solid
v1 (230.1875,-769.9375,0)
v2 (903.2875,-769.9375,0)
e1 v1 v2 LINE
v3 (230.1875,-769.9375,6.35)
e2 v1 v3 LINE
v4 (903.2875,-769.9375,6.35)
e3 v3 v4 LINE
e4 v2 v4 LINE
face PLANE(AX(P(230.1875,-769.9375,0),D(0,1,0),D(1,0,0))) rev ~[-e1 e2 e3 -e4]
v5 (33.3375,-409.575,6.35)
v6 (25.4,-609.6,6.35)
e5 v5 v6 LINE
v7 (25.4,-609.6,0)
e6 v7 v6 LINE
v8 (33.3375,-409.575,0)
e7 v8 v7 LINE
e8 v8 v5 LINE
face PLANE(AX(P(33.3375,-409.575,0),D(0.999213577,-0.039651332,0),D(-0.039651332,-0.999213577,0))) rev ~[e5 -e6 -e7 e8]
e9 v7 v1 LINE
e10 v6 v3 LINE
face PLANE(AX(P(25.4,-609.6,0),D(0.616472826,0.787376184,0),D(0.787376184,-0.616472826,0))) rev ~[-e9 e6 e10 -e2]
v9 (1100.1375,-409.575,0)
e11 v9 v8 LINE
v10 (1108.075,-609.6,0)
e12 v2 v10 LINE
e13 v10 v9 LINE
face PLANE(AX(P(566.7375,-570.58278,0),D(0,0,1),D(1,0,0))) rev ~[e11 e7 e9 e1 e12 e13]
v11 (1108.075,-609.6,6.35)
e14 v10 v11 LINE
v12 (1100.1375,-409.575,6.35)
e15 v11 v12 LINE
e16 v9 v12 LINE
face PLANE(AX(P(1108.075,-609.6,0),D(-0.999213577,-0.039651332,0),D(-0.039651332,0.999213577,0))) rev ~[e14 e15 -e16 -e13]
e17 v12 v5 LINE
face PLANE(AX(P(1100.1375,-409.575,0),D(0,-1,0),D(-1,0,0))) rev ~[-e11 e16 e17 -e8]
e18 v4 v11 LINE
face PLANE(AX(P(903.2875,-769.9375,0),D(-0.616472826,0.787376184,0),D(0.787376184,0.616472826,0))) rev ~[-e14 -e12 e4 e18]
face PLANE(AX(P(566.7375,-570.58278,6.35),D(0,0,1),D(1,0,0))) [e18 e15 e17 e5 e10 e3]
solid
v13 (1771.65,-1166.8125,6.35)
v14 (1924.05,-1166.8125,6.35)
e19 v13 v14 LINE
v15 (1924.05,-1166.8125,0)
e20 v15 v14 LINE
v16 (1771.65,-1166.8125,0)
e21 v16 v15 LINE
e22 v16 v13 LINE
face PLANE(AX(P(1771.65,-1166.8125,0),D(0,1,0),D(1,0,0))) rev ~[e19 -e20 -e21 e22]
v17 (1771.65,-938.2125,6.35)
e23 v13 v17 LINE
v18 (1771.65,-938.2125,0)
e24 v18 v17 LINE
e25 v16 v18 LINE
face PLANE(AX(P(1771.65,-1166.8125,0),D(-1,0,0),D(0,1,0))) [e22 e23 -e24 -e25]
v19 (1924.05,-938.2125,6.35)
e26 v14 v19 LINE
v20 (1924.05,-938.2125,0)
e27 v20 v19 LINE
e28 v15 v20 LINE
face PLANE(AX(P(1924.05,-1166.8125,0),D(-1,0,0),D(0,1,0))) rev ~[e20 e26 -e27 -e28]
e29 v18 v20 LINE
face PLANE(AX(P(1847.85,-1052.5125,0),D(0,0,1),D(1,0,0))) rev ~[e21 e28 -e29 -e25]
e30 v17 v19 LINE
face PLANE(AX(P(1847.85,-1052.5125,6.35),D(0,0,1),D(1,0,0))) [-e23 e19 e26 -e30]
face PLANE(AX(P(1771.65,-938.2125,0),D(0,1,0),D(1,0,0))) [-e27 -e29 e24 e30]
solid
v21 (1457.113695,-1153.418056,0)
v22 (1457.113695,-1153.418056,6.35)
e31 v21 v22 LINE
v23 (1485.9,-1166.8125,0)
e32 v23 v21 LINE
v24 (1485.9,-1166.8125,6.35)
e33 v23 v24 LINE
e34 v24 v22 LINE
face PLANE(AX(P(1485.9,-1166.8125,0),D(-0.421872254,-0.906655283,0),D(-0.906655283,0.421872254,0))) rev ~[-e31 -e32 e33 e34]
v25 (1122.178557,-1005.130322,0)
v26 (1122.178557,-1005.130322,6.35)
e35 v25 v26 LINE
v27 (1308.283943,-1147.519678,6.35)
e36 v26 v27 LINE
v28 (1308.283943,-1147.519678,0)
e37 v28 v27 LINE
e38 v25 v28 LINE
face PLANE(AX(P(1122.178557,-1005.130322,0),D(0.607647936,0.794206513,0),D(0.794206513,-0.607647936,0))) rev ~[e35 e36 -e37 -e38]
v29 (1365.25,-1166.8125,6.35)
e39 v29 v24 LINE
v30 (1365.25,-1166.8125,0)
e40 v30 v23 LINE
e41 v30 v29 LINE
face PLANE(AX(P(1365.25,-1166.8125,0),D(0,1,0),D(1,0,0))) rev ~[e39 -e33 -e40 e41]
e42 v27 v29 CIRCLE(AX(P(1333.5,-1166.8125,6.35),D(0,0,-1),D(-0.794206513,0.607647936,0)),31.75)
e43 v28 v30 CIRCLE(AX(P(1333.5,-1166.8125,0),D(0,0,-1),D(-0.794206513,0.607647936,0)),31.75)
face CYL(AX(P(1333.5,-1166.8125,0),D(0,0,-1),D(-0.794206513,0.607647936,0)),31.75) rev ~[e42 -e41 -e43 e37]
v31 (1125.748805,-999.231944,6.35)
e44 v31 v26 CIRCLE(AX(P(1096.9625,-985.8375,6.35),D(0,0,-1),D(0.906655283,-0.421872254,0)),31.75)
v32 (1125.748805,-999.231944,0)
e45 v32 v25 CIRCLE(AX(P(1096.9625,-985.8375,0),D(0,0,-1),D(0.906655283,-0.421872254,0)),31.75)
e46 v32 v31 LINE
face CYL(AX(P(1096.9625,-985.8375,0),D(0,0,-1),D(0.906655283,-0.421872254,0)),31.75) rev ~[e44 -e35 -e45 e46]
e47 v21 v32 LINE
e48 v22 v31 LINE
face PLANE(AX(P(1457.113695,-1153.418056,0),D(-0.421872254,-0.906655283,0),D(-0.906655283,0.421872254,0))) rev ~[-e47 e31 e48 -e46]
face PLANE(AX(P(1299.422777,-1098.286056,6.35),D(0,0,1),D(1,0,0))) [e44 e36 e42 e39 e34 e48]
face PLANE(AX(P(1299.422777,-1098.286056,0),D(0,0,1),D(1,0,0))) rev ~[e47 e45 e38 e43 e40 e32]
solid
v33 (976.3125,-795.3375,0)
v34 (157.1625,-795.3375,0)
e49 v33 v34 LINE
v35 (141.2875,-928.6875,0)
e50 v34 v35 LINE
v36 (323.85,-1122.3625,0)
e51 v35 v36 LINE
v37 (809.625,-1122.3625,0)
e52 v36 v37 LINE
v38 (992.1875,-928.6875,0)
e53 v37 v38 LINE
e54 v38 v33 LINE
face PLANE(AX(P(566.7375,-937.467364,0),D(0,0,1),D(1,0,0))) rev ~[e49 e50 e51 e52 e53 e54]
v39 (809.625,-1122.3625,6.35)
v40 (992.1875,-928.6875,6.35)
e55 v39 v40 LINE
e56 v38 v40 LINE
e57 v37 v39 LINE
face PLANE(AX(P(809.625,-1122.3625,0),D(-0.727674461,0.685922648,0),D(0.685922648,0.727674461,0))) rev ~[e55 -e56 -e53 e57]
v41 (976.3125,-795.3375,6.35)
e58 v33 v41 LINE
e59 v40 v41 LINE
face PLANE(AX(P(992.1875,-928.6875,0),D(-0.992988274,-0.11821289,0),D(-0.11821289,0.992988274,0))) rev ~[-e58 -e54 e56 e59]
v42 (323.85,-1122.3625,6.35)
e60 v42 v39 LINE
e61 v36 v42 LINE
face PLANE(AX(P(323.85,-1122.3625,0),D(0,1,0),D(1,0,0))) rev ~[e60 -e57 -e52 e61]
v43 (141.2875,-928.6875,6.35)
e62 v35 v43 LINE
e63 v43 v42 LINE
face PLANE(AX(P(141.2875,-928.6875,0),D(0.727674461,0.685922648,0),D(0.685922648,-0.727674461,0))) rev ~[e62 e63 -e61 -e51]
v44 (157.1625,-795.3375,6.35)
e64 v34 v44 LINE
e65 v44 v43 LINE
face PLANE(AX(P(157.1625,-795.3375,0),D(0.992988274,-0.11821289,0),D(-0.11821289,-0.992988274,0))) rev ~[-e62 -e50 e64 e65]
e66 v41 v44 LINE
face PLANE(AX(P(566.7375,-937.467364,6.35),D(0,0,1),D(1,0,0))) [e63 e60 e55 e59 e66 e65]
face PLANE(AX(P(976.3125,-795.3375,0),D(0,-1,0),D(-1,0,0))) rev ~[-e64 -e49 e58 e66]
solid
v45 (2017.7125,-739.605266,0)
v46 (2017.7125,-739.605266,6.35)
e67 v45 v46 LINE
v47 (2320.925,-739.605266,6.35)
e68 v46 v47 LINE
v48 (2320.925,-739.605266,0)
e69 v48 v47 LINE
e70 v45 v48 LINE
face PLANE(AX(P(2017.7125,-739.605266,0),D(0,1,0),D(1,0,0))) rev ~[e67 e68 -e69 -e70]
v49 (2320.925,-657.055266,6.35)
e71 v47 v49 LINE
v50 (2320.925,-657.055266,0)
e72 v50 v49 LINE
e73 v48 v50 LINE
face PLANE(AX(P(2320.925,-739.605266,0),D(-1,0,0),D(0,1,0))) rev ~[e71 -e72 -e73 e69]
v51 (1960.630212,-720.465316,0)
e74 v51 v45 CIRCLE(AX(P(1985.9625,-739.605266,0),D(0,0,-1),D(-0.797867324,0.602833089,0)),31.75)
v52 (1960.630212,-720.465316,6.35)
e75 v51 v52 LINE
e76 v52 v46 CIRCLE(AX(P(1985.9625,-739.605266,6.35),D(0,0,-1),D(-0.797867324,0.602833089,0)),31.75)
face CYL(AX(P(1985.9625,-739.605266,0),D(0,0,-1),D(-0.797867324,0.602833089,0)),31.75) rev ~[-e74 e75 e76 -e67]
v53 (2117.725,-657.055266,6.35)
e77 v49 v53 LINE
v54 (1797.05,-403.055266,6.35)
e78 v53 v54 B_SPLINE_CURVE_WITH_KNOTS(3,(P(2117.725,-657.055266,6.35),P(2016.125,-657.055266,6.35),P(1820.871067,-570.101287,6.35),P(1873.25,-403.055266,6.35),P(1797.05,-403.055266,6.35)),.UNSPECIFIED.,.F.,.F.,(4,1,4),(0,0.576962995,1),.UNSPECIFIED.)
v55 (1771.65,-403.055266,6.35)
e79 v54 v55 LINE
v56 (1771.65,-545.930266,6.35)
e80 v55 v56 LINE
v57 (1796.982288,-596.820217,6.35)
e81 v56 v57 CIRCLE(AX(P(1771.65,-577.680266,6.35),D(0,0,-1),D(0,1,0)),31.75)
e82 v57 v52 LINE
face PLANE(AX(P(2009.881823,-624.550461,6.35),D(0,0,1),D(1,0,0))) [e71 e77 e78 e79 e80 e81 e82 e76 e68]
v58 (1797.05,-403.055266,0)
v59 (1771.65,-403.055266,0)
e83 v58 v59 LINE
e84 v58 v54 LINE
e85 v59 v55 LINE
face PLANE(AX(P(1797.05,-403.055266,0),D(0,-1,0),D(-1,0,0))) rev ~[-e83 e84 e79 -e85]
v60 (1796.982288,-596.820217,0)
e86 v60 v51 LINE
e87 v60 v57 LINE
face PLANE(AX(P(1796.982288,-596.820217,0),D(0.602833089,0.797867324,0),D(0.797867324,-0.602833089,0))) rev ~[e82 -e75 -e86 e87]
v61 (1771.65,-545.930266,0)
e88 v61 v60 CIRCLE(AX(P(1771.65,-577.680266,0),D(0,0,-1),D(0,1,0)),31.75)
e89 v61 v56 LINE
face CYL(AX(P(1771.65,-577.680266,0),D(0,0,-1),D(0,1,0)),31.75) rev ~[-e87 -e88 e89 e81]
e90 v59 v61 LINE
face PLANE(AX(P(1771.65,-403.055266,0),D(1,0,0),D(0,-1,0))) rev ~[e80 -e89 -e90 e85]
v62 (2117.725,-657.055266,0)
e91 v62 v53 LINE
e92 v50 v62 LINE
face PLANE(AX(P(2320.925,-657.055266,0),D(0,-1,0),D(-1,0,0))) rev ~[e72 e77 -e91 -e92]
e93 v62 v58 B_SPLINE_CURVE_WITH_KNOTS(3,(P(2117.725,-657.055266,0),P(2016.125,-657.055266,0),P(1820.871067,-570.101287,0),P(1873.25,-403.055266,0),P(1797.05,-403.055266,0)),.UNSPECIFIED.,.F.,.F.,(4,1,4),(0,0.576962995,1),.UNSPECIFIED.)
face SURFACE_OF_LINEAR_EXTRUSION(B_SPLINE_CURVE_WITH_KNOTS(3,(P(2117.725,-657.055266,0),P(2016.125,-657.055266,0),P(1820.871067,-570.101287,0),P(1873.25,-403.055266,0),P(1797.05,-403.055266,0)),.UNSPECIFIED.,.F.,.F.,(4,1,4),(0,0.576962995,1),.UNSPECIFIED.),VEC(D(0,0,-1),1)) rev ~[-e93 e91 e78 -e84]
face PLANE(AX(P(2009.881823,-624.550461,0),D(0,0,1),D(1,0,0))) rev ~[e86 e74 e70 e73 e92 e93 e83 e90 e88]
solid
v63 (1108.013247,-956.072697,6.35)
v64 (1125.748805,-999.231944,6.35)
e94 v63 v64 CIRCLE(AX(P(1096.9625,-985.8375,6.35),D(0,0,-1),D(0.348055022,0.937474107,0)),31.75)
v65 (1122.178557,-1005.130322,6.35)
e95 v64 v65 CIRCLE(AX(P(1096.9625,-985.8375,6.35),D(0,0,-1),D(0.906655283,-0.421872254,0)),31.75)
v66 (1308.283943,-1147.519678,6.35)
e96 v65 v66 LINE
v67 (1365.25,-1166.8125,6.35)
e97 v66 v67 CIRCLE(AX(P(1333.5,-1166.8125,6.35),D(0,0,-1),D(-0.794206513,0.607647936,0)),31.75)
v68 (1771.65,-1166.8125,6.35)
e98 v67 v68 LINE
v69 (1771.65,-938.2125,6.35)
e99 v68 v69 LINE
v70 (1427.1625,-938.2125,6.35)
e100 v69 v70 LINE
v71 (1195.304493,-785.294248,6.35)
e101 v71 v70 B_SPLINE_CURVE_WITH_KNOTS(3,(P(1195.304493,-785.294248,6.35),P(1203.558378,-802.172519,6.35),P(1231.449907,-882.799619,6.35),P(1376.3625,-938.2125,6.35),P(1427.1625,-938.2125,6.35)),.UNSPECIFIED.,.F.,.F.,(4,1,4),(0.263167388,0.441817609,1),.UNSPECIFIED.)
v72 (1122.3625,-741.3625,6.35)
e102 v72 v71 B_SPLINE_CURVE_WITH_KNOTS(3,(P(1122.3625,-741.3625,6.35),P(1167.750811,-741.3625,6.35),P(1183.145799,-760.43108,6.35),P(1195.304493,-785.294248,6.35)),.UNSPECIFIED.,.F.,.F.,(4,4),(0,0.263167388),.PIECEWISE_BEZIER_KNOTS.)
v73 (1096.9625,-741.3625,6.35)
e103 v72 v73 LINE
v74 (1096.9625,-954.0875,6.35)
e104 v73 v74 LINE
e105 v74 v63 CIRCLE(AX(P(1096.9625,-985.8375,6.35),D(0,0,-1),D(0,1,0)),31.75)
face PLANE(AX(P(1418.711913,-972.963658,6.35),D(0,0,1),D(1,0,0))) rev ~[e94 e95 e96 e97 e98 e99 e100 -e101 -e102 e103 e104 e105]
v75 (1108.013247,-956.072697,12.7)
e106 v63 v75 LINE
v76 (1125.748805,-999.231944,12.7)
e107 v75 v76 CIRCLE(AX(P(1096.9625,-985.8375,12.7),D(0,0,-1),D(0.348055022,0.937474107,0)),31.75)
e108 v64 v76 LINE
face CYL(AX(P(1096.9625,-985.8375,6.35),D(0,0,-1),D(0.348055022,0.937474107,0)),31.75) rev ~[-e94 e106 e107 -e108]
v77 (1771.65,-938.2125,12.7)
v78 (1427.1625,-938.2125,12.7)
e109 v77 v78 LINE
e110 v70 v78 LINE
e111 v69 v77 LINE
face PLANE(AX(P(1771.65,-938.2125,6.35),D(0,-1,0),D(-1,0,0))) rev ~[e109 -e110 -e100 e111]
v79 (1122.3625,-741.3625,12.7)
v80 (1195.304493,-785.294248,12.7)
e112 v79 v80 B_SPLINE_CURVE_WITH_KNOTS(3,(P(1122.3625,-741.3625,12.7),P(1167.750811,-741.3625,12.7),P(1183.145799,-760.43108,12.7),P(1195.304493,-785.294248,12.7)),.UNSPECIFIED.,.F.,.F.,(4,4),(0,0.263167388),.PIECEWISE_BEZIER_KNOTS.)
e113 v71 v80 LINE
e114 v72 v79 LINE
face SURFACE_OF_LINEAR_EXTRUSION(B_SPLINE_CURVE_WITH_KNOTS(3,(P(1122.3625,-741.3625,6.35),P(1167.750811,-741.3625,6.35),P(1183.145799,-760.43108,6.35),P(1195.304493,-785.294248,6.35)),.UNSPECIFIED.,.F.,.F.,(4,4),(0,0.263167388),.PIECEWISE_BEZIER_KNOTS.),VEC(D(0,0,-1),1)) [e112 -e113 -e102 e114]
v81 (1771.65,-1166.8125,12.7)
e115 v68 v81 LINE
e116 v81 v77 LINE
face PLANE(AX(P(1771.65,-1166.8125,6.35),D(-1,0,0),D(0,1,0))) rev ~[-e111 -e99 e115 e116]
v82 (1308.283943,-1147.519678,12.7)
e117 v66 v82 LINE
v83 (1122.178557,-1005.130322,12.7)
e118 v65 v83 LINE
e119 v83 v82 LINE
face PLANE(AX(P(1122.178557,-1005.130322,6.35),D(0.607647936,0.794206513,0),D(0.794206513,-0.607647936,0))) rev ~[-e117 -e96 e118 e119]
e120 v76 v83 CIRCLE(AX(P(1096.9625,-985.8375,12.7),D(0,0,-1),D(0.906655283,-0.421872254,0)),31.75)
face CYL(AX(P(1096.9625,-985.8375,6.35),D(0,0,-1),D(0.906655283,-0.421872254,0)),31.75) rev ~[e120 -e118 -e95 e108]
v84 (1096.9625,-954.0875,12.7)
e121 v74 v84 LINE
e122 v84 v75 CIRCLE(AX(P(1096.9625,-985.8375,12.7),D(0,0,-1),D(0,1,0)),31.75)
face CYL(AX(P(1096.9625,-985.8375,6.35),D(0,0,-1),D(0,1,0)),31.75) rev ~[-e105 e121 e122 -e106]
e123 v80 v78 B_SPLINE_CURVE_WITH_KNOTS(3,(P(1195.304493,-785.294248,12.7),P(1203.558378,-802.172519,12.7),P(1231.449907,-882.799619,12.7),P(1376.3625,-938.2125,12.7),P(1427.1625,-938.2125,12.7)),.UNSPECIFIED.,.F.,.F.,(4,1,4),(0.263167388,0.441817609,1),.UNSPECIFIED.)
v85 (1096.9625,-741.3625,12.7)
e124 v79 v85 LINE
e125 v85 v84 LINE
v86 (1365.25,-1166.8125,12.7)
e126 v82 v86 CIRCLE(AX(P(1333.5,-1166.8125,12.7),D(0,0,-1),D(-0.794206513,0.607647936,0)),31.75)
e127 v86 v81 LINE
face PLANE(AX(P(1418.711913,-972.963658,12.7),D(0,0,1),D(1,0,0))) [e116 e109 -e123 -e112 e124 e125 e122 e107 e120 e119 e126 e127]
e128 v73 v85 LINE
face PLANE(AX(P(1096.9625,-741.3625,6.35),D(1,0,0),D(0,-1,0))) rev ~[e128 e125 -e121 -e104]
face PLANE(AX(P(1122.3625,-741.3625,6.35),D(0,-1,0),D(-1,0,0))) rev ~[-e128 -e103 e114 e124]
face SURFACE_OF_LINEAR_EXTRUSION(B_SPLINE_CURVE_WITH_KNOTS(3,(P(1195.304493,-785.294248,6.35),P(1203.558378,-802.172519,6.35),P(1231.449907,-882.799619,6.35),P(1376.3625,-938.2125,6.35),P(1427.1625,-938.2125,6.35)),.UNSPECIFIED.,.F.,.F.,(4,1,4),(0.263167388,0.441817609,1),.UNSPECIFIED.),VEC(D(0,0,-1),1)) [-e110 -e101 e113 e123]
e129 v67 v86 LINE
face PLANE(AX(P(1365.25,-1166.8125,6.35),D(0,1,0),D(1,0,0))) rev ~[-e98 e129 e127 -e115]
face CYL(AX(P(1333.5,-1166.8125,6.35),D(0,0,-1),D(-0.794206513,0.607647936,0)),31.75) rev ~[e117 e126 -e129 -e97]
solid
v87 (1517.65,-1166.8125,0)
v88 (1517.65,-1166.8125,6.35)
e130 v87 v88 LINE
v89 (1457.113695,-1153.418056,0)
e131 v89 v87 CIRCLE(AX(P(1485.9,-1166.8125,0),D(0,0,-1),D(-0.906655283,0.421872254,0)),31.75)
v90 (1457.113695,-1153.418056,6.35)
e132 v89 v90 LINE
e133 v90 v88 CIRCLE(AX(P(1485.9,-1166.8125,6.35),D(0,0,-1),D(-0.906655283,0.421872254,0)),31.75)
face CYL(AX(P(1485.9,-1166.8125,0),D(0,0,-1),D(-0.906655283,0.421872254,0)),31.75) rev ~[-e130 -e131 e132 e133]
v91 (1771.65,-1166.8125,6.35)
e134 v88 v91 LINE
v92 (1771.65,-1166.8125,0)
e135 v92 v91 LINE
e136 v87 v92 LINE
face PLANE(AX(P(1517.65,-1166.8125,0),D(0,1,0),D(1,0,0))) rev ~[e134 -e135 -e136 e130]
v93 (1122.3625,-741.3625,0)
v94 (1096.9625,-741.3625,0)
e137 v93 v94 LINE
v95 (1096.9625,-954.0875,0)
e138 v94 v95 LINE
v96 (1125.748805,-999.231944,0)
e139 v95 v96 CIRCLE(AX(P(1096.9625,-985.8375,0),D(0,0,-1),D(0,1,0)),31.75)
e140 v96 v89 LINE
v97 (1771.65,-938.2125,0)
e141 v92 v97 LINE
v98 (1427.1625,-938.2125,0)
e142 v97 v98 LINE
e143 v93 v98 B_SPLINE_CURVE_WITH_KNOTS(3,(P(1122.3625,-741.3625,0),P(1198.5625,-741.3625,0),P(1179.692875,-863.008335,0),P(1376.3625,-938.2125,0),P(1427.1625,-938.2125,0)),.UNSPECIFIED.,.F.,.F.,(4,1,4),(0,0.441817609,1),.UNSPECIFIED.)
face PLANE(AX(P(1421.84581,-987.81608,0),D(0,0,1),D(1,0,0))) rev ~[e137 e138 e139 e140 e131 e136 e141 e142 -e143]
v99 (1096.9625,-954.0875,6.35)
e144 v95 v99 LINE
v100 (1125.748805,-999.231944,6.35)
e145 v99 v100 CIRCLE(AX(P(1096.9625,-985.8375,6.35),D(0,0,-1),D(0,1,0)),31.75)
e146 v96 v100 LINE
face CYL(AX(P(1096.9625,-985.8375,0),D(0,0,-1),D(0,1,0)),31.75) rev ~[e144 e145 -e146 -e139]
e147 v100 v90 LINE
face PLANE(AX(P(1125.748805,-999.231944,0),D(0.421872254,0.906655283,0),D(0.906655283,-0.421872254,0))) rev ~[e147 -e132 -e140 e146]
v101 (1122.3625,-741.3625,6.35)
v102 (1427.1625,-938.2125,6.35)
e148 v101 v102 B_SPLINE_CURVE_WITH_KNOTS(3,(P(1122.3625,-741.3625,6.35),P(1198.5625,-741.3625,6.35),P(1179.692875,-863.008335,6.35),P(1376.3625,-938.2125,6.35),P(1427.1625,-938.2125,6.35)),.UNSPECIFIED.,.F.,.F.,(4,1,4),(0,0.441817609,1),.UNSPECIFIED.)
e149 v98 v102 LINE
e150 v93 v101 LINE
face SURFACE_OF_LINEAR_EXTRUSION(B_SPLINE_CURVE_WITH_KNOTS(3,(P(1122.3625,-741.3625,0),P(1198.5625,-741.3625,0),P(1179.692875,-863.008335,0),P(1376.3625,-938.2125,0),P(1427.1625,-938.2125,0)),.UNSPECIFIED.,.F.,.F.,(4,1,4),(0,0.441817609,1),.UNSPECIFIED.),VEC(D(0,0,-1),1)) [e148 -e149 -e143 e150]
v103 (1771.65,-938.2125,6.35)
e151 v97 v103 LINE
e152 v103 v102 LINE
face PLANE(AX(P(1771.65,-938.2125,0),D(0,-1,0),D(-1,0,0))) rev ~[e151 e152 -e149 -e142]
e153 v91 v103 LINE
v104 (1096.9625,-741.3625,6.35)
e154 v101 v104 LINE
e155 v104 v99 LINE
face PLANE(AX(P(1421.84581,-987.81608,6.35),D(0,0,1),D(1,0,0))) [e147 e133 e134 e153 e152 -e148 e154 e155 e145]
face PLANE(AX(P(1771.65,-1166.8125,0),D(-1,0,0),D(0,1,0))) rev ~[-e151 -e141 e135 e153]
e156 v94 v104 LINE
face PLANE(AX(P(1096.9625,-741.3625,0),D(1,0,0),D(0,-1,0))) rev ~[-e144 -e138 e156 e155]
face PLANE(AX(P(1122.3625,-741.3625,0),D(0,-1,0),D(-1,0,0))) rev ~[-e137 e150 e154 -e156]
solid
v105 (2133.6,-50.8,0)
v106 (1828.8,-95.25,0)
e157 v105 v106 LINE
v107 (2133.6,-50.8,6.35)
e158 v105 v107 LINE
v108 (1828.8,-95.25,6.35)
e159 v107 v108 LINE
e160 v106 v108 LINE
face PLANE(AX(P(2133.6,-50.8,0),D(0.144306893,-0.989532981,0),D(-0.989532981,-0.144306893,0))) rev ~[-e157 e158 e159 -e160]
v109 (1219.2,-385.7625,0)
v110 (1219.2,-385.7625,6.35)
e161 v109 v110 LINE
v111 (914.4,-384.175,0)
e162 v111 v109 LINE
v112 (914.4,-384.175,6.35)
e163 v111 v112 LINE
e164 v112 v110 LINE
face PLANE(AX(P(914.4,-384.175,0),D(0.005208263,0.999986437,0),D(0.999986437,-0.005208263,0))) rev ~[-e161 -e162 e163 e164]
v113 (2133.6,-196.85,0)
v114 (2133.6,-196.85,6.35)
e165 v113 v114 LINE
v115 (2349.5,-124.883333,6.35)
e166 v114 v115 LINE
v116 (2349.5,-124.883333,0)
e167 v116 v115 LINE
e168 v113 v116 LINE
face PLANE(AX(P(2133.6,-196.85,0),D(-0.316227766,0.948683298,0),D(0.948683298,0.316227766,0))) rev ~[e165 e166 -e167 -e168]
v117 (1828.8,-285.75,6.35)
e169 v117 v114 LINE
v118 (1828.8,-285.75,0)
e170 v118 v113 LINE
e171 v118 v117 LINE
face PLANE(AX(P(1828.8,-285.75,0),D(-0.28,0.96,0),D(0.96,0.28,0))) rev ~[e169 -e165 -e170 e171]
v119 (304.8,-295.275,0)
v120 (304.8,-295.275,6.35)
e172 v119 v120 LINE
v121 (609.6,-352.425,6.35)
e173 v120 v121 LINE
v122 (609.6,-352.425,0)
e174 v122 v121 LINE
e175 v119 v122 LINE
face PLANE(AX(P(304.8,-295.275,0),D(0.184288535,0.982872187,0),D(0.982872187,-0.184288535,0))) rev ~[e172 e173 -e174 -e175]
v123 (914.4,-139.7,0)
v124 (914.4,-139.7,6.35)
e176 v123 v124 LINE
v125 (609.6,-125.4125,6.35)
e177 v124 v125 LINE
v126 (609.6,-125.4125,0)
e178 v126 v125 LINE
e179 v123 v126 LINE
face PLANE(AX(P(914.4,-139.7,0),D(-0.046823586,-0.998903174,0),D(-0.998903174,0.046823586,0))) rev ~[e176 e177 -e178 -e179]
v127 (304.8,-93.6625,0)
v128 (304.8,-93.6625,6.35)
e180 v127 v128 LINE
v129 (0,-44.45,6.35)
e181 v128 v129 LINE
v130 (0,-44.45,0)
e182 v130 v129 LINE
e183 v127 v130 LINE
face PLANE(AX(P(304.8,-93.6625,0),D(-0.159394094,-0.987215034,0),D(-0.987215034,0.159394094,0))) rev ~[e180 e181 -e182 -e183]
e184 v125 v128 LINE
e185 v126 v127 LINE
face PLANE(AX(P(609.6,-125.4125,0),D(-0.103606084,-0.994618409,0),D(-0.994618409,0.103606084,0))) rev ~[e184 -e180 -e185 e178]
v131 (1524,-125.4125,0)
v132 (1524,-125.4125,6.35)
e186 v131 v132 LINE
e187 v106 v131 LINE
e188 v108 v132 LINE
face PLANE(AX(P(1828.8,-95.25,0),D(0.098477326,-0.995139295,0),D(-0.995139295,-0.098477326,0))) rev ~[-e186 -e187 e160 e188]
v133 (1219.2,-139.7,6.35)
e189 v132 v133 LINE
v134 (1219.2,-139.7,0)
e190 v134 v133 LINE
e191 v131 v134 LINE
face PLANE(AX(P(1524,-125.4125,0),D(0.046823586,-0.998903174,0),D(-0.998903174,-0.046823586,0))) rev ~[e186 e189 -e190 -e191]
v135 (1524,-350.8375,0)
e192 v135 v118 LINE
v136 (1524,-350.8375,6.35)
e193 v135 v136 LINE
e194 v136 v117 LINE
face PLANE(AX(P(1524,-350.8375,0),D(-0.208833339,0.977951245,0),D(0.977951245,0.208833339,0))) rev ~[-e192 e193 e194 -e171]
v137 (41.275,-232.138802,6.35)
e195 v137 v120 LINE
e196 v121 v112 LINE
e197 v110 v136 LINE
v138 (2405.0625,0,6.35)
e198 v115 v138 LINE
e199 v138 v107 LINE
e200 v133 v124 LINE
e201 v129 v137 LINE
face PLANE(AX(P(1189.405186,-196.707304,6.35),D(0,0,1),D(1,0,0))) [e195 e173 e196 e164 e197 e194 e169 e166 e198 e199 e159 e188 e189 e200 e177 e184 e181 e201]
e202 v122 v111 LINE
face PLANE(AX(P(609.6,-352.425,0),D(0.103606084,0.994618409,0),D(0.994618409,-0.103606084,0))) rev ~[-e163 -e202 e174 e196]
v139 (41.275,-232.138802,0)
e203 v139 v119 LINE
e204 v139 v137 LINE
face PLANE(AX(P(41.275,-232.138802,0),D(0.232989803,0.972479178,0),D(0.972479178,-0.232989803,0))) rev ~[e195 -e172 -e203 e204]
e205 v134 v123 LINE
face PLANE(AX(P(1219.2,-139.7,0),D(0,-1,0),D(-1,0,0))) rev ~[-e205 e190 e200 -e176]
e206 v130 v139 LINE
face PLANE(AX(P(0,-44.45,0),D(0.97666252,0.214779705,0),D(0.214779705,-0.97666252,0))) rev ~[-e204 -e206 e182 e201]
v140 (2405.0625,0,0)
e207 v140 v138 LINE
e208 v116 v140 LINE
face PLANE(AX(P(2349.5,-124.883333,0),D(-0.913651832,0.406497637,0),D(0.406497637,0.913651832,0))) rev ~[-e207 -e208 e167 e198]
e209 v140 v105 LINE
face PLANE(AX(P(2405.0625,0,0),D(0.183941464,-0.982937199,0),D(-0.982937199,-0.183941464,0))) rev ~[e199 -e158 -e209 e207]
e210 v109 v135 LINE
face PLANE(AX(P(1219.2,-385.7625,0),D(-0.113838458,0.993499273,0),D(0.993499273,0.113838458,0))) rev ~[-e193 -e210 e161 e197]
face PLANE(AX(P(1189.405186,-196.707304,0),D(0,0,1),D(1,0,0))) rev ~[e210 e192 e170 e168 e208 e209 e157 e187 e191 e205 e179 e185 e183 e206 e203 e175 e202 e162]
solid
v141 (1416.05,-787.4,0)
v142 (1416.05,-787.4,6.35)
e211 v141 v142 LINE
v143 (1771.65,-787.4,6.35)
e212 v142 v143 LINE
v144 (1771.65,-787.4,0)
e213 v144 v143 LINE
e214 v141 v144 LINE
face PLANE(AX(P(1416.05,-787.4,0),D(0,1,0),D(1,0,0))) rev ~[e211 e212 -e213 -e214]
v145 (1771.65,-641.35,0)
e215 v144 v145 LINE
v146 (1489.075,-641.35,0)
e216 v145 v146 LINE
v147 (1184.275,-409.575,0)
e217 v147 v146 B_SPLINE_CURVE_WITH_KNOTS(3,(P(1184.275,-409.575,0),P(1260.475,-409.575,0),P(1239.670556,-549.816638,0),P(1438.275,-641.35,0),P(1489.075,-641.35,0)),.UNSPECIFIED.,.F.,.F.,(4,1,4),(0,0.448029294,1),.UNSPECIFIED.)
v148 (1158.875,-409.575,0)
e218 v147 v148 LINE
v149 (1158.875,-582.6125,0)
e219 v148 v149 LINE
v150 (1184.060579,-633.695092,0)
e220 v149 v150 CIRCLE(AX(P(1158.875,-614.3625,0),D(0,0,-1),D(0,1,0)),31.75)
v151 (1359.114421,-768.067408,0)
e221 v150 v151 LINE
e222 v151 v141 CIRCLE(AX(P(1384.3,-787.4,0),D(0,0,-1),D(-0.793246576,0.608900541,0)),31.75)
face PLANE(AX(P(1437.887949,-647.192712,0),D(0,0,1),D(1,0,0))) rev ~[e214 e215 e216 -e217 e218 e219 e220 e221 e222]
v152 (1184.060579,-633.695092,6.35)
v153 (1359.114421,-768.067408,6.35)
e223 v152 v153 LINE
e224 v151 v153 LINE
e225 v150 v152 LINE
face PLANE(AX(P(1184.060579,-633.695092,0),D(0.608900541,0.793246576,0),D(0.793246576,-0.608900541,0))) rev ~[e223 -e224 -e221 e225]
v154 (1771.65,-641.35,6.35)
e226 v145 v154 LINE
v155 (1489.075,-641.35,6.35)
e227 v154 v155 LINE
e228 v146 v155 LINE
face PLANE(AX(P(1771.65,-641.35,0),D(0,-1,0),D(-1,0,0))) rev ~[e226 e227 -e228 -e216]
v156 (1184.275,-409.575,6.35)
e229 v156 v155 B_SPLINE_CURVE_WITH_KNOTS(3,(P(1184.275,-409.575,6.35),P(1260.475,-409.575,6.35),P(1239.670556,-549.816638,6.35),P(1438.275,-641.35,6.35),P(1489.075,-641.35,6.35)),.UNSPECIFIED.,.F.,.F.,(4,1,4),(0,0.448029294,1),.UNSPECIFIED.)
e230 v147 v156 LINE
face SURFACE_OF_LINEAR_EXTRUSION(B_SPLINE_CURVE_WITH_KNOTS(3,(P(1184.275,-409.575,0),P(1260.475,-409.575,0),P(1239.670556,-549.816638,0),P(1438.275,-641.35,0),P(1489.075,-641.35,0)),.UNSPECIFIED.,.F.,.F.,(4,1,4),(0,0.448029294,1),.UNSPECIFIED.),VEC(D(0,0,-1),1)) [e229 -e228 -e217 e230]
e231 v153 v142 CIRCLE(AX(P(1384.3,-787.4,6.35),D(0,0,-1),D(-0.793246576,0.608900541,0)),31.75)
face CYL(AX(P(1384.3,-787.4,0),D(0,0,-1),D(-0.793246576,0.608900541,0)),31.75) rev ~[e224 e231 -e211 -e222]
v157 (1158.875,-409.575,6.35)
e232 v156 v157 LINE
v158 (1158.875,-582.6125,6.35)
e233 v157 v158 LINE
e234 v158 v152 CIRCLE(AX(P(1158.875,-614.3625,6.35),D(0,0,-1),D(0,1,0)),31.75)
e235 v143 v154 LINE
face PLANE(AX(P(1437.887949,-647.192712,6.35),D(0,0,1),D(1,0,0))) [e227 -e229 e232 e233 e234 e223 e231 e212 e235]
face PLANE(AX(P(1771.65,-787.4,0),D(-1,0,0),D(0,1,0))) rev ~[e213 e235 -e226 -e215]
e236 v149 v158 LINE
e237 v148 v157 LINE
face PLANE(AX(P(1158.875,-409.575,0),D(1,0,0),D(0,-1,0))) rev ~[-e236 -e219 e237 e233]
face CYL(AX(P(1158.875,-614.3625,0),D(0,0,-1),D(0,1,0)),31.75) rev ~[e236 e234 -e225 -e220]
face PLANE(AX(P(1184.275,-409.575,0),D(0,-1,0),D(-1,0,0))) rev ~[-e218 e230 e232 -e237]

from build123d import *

# Parameters (mm, degrees)
F1_DEPTH = 6.35
F2_DEPTH = 6.35
F0_W     = 152.4
F0_H     = 228.6
F5_DEPTH = 6.35


with BuildPart() as f1:
    # F0 (on Top) → F1 (new body)
    with BuildSketch(Plane.XY):
        with BuildLine():
            Line((1184.275, -409.575), (1158.875, -409.575))
            Line((1158.875, -409.575), (1158.875, -582.6125))
            ThreePointArc((1158.875, -582.6125), (1187.3519406863, -600.3223308717), (1184.0605788026, -633.6950921795))
            Line((1184.0605788026, -633.6950921795), (1359.1144211974, -768.0674078205))
            ThreePointArc((1359.1144211974, -768.0674078205), (1394.5083390671, -757.3358633337), (1416.05, -787.4))
            Line((1416.05, -787.4), (1771.65, -787.4))
            Line((1771.65, -787.4), (1771.65, -641.35))
            Line((1771.65, -641.35), (1489.075, -641.35))
            add(Edge.make_bspline(
                [(1184.275, -409.575), (1260.475, -409.575), (1239.6705562427, -549.8166383278), (1438.275, -641.35), (1489.075, -641.35)],
                knots=[0, 0, 0, 0, 0.4480292942, 1, 1, 1, 1], degree=3))
        make_face()
    extrude(amount=F1_DEPTH)


with BuildPart() as f1b:
    # F0 (on Top) → F1, piece 2 (new body)
    with BuildSketch(Plane.XY):
        with BuildLine():
            Line((1517.65, -1166.8125), (1771.65, -1166.8125))
            Line((1771.65, -1166.8125), (1771.65, -938.2125))
            Line((1771.65, -938.2125), (1427.1625, -938.2125))
            add(Edge.make_bspline(
                [(1122.3625, -741.3625), (1198.5625, -741.3625), (1179.69287535, -863.0083351522), (1376.3625, -938.2125), (1427.1625, -938.2125)],
                knots=[0, 0, 0, 0, 0.441817609, 1, 1, 1, 1], degree=3))
            Line((1122.3625, -741.3625), (1096.9625, -741.3625))
            Line((1096.9625, -741.3625), (1096.9625, -954.0875))
            ThreePointArc((1096.9625, -954.0875), (1123.7331565008, -968.7672202566), (1125.7488052209, -999.231944062))
            Line((1125.7488052209, -999.231944062), (1457.1136947791, -1153.418055938))
            ThreePointArc((1457.1136947791, -1153.418055938), (1492.7592021853, -1135.8122766882), (1517.65, -1166.8125))
        make_face()
    extrude(amount=F1_DEPTH)


with BuildPart() as f1c:
    # F0 (on Top) → F1, piece 3 (new body)
    with BuildSketch(Plane.XY):
        with BuildLine():
            Line((1797.05, -403.0552663527), (1771.65, -403.0552663527))
            Line((1771.65, -403.0552663527), (1771.65, -545.9302663527))
            ThreePointArc((1771.65, -545.9302663527), (1800.0731941464, -563.5316079528), (1796.9822875345, -596.8202169344))
            Line((1796.9822875345, -596.8202169344), (1960.6302124655, -720.4653157711))
            ThreePointArc((1960.6302124655, -720.4653157711), (1996.0561210247, -709.5024207296), (2017.7125, -739.6052663527))
            Line((2017.7125, -739.6052663527), (2320.925, -739.6052663527))
            Line((2320.925, -739.6052663527), (2320.925, -657.0552663527))
            Line((2320.925, -657.0552663527), (2117.725, -657.0552663527))
            add(Edge.make_bspline(
                [(2117.725, -657.0552663527), (2016.125, -657.0552663527), (1820.8710671265, -570.1012868563), (1873.25, -403.0552663527), (1797.05, -403.0552663527)],
                knots=[0, 0, 0, 0, 0.5769629955, 1, 1, 1, 1], degree=3))
        make_face()
    extrude(amount=F1_DEPTH)


with BuildPart() as f1d:
    # F0 (on Top) → F1, piece 4 (new body)
    with BuildSketch(Plane.XY):
        Polygon((976.3125, -795.3375), (566.7375, -795.3375), (157.1625, -795.3375), (141.2875, -928.6875), (323.85, -1122.3625), (566.7375, -1122.3625), (809.625, -1122.3625), (992.1875, -928.6875), align=None)
    extrude(amount=F1_DEPTH)


with BuildPart() as f1e:
    # F0 (on Top) → F1, piece 5 (new body)
    with BuildSketch(Plane.XY):
        Polygon((566.7375, -409.575), (33.3375, -409.575), (25.4, -609.6), (230.1875, -769.9375), (566.7375, -769.9375), (903.2875, -769.9375), (1108.075, -609.6), (1100.1375, -409.575), align=None)
    extrude(amount=F1_DEPTH)


with BuildPart() as f1f:
    # F0 (on Top) → F1, piece 6 (new body)
    with BuildSketch(Plane.XY):
        Polygon((304.8, -93.6625), (0, -44.45), (41.275, -232.1388020833), (304.8, -295.275), (609.6, -352.425), (914.4, -384.175), (1219.2, -385.7625), (1524, -350.8375), (1828.8, -285.75), (2133.6, -196.85), (2349.5, -124.8833333333), (2405.0625, 0), (2133.6, -50.8), (1828.8, -95.25), (1524, -125.4125), (1219.2, -139.7), (914.4, -139.7), (609.6, -125.4125), align=None)
    extrude(amount=F1_DEPTH)


with BuildPart() as f2:
    # F0 (on Top) → F2 (new body)
    with BuildSketch(Plane.XY):
        with BuildLine():
            Line((1365.25, -1166.8125), (1485.9, -1166.8125))
            Line((1485.9, -1166.8125), (1457.1136947791, -1153.418055938))
            Line((1457.1136947791, -1153.418055938), (1125.7488052209, -999.231944062))
            ThreePointArc((1125.7488052209, -999.231944062), (1124.124265246, -1002.2783335774), (1122.1785567933, -1005.130321976))
            Line((1122.1785567933, -1005.130321976), (1308.2839432067, -1147.519678024))
            ThreePointArc((1308.2839432067, -1147.519678024), (1343.6846133165, -1136.740317645), (1365.25, -1166.8125))
        make_face()
    extrude(amount=F2_DEPTH)


with BuildPart() as f2b:
    # F0 (on Top) → F2, piece 2 (new body)
    with BuildSketch(Plane.XY):
        with Locations((1847.85, -1052.5125)):
            Rectangle(F0_W, F0_H)
    extrude(amount=F2_DEPTH)


with BuildPart() as f5:
    # F4 (on face) → F5 (new body)
    with BuildSketch(Plane.XY.offset(6.35)):
        with BuildLine():
            Line((1096.9625, -741.3625), (1096.9625, -954.0875))
            ThreePointArc((1096.9625, -954.0875), (1102.5763225769, -954.5877400637), (1108.0132469514, -956.0726970977))
            Line((1108.0132469514, -956.0726970977), (1675.633582901, -1166.8125))
            Line((1675.633582901, -1166.8125), (1771.65, -1166.8125))
            Line((1771.65, -1166.8125), (1771.65, -938.2125))
            Line((1771.65, -938.2125), (1427.1625, -938.2125))
            add(Edge.make_bspline(
                [(1195.3044928639, -785.2942482262), (1188.3905985456, -810.7493696117), (1146.6295208593, -926.9508572649), (1326.0216633776, -937.4958061878), (1411.7701730659, -939.0812615273), (1427.1625, -938.2125)],
                knots=[127.292389292, 127.292389292, 127.292389292, 127.292389292, 199.3006577737, 409.8585065241, 460.6585065241, 460.6585065241, 460.6585065241, 460.6585065241], degree=3))
            add(Edge.make_bspline(
                [(1122.3625, -741.3625), (1167.7508107351, -741.3625), (1183.1457987153, -760.4310803701), (1195.3044928639, -785.2942482262)],
                knots=[0, 0, 0, 0, 0.2631673875, 0.2631673875, 0.2631673875, 0.2631673875], degree=3))
            Line((1122.3625, -741.3625), (1096.9625, -741.3625))
        make_face()
        with BuildLine():
            Line((1675.633582901, -1166.8125), (1108.0132469514, -956.0726970977))
            ThreePointArc((1108.0132469514, -956.0726970977), (1126.3296216001, -973.7695810028), (1125.7488052209, -999.231944062))
            ThreePointArc((1125.7488052209, -999.231944062), (1124.124265246, -1002.2783335774), (1122.1785567933, -1005.130321976))
            Line((1122.1785567933, -1005.130321976), (1308.2839432067, -1147.519678024))
            ThreePointArc((1308.2839432067, -1147.519678024), (1343.6846133165, -1136.740317645), (1365.25, -1166.8125))
            Line((1365.25, -1166.8125), (1485.9, -1166.8125))
            Line((1485.9, -1166.8125), (1517.65, -1166.8125))
            Line((1517.65, -1166.8125), (1675.633582901, -1166.8125))
        make_face()
        with BuildLine():
            add(Edge.make_bspline(
                [(1195.3044928639, -785.2942482262), (1203.5583780583, -802.1725190786), (1231.4499066642, -882.7996187422), (1376.3625, -938.2125), (1427.1625, -938.2125)],
                knots=[0.2631673875, 0.2631673875, 0.2631673875, 0.2631673875, 0.441817609, 1, 1, 1, 1], degree=3))
            add(Edge.make_bspline(
                [(1195.3044928639, -785.2942482262), (1188.3905985456, -810.7493696117), (1146.6295208593, -926.9508572649), (1326.0216633776, -937.4958061878), (1411.7701730659, -939.0812615273), (1427.1625, -938.2125)],
                knots=[127.292389292, 127.292389292, 127.292389292, 127.292389292, 199.3006577737, 409.8585065241, 460.6585065241, 460.6585065241, 460.6585065241, 460.6585065241], degree=3))
        make_face()
    extrude(amount=F5_DEPTH)


solid = Compound([f1.part, f1b.part, f1c.part, f1d.part, f1e.part, f1f.part, f2.part, f2b.part, f5.part])
